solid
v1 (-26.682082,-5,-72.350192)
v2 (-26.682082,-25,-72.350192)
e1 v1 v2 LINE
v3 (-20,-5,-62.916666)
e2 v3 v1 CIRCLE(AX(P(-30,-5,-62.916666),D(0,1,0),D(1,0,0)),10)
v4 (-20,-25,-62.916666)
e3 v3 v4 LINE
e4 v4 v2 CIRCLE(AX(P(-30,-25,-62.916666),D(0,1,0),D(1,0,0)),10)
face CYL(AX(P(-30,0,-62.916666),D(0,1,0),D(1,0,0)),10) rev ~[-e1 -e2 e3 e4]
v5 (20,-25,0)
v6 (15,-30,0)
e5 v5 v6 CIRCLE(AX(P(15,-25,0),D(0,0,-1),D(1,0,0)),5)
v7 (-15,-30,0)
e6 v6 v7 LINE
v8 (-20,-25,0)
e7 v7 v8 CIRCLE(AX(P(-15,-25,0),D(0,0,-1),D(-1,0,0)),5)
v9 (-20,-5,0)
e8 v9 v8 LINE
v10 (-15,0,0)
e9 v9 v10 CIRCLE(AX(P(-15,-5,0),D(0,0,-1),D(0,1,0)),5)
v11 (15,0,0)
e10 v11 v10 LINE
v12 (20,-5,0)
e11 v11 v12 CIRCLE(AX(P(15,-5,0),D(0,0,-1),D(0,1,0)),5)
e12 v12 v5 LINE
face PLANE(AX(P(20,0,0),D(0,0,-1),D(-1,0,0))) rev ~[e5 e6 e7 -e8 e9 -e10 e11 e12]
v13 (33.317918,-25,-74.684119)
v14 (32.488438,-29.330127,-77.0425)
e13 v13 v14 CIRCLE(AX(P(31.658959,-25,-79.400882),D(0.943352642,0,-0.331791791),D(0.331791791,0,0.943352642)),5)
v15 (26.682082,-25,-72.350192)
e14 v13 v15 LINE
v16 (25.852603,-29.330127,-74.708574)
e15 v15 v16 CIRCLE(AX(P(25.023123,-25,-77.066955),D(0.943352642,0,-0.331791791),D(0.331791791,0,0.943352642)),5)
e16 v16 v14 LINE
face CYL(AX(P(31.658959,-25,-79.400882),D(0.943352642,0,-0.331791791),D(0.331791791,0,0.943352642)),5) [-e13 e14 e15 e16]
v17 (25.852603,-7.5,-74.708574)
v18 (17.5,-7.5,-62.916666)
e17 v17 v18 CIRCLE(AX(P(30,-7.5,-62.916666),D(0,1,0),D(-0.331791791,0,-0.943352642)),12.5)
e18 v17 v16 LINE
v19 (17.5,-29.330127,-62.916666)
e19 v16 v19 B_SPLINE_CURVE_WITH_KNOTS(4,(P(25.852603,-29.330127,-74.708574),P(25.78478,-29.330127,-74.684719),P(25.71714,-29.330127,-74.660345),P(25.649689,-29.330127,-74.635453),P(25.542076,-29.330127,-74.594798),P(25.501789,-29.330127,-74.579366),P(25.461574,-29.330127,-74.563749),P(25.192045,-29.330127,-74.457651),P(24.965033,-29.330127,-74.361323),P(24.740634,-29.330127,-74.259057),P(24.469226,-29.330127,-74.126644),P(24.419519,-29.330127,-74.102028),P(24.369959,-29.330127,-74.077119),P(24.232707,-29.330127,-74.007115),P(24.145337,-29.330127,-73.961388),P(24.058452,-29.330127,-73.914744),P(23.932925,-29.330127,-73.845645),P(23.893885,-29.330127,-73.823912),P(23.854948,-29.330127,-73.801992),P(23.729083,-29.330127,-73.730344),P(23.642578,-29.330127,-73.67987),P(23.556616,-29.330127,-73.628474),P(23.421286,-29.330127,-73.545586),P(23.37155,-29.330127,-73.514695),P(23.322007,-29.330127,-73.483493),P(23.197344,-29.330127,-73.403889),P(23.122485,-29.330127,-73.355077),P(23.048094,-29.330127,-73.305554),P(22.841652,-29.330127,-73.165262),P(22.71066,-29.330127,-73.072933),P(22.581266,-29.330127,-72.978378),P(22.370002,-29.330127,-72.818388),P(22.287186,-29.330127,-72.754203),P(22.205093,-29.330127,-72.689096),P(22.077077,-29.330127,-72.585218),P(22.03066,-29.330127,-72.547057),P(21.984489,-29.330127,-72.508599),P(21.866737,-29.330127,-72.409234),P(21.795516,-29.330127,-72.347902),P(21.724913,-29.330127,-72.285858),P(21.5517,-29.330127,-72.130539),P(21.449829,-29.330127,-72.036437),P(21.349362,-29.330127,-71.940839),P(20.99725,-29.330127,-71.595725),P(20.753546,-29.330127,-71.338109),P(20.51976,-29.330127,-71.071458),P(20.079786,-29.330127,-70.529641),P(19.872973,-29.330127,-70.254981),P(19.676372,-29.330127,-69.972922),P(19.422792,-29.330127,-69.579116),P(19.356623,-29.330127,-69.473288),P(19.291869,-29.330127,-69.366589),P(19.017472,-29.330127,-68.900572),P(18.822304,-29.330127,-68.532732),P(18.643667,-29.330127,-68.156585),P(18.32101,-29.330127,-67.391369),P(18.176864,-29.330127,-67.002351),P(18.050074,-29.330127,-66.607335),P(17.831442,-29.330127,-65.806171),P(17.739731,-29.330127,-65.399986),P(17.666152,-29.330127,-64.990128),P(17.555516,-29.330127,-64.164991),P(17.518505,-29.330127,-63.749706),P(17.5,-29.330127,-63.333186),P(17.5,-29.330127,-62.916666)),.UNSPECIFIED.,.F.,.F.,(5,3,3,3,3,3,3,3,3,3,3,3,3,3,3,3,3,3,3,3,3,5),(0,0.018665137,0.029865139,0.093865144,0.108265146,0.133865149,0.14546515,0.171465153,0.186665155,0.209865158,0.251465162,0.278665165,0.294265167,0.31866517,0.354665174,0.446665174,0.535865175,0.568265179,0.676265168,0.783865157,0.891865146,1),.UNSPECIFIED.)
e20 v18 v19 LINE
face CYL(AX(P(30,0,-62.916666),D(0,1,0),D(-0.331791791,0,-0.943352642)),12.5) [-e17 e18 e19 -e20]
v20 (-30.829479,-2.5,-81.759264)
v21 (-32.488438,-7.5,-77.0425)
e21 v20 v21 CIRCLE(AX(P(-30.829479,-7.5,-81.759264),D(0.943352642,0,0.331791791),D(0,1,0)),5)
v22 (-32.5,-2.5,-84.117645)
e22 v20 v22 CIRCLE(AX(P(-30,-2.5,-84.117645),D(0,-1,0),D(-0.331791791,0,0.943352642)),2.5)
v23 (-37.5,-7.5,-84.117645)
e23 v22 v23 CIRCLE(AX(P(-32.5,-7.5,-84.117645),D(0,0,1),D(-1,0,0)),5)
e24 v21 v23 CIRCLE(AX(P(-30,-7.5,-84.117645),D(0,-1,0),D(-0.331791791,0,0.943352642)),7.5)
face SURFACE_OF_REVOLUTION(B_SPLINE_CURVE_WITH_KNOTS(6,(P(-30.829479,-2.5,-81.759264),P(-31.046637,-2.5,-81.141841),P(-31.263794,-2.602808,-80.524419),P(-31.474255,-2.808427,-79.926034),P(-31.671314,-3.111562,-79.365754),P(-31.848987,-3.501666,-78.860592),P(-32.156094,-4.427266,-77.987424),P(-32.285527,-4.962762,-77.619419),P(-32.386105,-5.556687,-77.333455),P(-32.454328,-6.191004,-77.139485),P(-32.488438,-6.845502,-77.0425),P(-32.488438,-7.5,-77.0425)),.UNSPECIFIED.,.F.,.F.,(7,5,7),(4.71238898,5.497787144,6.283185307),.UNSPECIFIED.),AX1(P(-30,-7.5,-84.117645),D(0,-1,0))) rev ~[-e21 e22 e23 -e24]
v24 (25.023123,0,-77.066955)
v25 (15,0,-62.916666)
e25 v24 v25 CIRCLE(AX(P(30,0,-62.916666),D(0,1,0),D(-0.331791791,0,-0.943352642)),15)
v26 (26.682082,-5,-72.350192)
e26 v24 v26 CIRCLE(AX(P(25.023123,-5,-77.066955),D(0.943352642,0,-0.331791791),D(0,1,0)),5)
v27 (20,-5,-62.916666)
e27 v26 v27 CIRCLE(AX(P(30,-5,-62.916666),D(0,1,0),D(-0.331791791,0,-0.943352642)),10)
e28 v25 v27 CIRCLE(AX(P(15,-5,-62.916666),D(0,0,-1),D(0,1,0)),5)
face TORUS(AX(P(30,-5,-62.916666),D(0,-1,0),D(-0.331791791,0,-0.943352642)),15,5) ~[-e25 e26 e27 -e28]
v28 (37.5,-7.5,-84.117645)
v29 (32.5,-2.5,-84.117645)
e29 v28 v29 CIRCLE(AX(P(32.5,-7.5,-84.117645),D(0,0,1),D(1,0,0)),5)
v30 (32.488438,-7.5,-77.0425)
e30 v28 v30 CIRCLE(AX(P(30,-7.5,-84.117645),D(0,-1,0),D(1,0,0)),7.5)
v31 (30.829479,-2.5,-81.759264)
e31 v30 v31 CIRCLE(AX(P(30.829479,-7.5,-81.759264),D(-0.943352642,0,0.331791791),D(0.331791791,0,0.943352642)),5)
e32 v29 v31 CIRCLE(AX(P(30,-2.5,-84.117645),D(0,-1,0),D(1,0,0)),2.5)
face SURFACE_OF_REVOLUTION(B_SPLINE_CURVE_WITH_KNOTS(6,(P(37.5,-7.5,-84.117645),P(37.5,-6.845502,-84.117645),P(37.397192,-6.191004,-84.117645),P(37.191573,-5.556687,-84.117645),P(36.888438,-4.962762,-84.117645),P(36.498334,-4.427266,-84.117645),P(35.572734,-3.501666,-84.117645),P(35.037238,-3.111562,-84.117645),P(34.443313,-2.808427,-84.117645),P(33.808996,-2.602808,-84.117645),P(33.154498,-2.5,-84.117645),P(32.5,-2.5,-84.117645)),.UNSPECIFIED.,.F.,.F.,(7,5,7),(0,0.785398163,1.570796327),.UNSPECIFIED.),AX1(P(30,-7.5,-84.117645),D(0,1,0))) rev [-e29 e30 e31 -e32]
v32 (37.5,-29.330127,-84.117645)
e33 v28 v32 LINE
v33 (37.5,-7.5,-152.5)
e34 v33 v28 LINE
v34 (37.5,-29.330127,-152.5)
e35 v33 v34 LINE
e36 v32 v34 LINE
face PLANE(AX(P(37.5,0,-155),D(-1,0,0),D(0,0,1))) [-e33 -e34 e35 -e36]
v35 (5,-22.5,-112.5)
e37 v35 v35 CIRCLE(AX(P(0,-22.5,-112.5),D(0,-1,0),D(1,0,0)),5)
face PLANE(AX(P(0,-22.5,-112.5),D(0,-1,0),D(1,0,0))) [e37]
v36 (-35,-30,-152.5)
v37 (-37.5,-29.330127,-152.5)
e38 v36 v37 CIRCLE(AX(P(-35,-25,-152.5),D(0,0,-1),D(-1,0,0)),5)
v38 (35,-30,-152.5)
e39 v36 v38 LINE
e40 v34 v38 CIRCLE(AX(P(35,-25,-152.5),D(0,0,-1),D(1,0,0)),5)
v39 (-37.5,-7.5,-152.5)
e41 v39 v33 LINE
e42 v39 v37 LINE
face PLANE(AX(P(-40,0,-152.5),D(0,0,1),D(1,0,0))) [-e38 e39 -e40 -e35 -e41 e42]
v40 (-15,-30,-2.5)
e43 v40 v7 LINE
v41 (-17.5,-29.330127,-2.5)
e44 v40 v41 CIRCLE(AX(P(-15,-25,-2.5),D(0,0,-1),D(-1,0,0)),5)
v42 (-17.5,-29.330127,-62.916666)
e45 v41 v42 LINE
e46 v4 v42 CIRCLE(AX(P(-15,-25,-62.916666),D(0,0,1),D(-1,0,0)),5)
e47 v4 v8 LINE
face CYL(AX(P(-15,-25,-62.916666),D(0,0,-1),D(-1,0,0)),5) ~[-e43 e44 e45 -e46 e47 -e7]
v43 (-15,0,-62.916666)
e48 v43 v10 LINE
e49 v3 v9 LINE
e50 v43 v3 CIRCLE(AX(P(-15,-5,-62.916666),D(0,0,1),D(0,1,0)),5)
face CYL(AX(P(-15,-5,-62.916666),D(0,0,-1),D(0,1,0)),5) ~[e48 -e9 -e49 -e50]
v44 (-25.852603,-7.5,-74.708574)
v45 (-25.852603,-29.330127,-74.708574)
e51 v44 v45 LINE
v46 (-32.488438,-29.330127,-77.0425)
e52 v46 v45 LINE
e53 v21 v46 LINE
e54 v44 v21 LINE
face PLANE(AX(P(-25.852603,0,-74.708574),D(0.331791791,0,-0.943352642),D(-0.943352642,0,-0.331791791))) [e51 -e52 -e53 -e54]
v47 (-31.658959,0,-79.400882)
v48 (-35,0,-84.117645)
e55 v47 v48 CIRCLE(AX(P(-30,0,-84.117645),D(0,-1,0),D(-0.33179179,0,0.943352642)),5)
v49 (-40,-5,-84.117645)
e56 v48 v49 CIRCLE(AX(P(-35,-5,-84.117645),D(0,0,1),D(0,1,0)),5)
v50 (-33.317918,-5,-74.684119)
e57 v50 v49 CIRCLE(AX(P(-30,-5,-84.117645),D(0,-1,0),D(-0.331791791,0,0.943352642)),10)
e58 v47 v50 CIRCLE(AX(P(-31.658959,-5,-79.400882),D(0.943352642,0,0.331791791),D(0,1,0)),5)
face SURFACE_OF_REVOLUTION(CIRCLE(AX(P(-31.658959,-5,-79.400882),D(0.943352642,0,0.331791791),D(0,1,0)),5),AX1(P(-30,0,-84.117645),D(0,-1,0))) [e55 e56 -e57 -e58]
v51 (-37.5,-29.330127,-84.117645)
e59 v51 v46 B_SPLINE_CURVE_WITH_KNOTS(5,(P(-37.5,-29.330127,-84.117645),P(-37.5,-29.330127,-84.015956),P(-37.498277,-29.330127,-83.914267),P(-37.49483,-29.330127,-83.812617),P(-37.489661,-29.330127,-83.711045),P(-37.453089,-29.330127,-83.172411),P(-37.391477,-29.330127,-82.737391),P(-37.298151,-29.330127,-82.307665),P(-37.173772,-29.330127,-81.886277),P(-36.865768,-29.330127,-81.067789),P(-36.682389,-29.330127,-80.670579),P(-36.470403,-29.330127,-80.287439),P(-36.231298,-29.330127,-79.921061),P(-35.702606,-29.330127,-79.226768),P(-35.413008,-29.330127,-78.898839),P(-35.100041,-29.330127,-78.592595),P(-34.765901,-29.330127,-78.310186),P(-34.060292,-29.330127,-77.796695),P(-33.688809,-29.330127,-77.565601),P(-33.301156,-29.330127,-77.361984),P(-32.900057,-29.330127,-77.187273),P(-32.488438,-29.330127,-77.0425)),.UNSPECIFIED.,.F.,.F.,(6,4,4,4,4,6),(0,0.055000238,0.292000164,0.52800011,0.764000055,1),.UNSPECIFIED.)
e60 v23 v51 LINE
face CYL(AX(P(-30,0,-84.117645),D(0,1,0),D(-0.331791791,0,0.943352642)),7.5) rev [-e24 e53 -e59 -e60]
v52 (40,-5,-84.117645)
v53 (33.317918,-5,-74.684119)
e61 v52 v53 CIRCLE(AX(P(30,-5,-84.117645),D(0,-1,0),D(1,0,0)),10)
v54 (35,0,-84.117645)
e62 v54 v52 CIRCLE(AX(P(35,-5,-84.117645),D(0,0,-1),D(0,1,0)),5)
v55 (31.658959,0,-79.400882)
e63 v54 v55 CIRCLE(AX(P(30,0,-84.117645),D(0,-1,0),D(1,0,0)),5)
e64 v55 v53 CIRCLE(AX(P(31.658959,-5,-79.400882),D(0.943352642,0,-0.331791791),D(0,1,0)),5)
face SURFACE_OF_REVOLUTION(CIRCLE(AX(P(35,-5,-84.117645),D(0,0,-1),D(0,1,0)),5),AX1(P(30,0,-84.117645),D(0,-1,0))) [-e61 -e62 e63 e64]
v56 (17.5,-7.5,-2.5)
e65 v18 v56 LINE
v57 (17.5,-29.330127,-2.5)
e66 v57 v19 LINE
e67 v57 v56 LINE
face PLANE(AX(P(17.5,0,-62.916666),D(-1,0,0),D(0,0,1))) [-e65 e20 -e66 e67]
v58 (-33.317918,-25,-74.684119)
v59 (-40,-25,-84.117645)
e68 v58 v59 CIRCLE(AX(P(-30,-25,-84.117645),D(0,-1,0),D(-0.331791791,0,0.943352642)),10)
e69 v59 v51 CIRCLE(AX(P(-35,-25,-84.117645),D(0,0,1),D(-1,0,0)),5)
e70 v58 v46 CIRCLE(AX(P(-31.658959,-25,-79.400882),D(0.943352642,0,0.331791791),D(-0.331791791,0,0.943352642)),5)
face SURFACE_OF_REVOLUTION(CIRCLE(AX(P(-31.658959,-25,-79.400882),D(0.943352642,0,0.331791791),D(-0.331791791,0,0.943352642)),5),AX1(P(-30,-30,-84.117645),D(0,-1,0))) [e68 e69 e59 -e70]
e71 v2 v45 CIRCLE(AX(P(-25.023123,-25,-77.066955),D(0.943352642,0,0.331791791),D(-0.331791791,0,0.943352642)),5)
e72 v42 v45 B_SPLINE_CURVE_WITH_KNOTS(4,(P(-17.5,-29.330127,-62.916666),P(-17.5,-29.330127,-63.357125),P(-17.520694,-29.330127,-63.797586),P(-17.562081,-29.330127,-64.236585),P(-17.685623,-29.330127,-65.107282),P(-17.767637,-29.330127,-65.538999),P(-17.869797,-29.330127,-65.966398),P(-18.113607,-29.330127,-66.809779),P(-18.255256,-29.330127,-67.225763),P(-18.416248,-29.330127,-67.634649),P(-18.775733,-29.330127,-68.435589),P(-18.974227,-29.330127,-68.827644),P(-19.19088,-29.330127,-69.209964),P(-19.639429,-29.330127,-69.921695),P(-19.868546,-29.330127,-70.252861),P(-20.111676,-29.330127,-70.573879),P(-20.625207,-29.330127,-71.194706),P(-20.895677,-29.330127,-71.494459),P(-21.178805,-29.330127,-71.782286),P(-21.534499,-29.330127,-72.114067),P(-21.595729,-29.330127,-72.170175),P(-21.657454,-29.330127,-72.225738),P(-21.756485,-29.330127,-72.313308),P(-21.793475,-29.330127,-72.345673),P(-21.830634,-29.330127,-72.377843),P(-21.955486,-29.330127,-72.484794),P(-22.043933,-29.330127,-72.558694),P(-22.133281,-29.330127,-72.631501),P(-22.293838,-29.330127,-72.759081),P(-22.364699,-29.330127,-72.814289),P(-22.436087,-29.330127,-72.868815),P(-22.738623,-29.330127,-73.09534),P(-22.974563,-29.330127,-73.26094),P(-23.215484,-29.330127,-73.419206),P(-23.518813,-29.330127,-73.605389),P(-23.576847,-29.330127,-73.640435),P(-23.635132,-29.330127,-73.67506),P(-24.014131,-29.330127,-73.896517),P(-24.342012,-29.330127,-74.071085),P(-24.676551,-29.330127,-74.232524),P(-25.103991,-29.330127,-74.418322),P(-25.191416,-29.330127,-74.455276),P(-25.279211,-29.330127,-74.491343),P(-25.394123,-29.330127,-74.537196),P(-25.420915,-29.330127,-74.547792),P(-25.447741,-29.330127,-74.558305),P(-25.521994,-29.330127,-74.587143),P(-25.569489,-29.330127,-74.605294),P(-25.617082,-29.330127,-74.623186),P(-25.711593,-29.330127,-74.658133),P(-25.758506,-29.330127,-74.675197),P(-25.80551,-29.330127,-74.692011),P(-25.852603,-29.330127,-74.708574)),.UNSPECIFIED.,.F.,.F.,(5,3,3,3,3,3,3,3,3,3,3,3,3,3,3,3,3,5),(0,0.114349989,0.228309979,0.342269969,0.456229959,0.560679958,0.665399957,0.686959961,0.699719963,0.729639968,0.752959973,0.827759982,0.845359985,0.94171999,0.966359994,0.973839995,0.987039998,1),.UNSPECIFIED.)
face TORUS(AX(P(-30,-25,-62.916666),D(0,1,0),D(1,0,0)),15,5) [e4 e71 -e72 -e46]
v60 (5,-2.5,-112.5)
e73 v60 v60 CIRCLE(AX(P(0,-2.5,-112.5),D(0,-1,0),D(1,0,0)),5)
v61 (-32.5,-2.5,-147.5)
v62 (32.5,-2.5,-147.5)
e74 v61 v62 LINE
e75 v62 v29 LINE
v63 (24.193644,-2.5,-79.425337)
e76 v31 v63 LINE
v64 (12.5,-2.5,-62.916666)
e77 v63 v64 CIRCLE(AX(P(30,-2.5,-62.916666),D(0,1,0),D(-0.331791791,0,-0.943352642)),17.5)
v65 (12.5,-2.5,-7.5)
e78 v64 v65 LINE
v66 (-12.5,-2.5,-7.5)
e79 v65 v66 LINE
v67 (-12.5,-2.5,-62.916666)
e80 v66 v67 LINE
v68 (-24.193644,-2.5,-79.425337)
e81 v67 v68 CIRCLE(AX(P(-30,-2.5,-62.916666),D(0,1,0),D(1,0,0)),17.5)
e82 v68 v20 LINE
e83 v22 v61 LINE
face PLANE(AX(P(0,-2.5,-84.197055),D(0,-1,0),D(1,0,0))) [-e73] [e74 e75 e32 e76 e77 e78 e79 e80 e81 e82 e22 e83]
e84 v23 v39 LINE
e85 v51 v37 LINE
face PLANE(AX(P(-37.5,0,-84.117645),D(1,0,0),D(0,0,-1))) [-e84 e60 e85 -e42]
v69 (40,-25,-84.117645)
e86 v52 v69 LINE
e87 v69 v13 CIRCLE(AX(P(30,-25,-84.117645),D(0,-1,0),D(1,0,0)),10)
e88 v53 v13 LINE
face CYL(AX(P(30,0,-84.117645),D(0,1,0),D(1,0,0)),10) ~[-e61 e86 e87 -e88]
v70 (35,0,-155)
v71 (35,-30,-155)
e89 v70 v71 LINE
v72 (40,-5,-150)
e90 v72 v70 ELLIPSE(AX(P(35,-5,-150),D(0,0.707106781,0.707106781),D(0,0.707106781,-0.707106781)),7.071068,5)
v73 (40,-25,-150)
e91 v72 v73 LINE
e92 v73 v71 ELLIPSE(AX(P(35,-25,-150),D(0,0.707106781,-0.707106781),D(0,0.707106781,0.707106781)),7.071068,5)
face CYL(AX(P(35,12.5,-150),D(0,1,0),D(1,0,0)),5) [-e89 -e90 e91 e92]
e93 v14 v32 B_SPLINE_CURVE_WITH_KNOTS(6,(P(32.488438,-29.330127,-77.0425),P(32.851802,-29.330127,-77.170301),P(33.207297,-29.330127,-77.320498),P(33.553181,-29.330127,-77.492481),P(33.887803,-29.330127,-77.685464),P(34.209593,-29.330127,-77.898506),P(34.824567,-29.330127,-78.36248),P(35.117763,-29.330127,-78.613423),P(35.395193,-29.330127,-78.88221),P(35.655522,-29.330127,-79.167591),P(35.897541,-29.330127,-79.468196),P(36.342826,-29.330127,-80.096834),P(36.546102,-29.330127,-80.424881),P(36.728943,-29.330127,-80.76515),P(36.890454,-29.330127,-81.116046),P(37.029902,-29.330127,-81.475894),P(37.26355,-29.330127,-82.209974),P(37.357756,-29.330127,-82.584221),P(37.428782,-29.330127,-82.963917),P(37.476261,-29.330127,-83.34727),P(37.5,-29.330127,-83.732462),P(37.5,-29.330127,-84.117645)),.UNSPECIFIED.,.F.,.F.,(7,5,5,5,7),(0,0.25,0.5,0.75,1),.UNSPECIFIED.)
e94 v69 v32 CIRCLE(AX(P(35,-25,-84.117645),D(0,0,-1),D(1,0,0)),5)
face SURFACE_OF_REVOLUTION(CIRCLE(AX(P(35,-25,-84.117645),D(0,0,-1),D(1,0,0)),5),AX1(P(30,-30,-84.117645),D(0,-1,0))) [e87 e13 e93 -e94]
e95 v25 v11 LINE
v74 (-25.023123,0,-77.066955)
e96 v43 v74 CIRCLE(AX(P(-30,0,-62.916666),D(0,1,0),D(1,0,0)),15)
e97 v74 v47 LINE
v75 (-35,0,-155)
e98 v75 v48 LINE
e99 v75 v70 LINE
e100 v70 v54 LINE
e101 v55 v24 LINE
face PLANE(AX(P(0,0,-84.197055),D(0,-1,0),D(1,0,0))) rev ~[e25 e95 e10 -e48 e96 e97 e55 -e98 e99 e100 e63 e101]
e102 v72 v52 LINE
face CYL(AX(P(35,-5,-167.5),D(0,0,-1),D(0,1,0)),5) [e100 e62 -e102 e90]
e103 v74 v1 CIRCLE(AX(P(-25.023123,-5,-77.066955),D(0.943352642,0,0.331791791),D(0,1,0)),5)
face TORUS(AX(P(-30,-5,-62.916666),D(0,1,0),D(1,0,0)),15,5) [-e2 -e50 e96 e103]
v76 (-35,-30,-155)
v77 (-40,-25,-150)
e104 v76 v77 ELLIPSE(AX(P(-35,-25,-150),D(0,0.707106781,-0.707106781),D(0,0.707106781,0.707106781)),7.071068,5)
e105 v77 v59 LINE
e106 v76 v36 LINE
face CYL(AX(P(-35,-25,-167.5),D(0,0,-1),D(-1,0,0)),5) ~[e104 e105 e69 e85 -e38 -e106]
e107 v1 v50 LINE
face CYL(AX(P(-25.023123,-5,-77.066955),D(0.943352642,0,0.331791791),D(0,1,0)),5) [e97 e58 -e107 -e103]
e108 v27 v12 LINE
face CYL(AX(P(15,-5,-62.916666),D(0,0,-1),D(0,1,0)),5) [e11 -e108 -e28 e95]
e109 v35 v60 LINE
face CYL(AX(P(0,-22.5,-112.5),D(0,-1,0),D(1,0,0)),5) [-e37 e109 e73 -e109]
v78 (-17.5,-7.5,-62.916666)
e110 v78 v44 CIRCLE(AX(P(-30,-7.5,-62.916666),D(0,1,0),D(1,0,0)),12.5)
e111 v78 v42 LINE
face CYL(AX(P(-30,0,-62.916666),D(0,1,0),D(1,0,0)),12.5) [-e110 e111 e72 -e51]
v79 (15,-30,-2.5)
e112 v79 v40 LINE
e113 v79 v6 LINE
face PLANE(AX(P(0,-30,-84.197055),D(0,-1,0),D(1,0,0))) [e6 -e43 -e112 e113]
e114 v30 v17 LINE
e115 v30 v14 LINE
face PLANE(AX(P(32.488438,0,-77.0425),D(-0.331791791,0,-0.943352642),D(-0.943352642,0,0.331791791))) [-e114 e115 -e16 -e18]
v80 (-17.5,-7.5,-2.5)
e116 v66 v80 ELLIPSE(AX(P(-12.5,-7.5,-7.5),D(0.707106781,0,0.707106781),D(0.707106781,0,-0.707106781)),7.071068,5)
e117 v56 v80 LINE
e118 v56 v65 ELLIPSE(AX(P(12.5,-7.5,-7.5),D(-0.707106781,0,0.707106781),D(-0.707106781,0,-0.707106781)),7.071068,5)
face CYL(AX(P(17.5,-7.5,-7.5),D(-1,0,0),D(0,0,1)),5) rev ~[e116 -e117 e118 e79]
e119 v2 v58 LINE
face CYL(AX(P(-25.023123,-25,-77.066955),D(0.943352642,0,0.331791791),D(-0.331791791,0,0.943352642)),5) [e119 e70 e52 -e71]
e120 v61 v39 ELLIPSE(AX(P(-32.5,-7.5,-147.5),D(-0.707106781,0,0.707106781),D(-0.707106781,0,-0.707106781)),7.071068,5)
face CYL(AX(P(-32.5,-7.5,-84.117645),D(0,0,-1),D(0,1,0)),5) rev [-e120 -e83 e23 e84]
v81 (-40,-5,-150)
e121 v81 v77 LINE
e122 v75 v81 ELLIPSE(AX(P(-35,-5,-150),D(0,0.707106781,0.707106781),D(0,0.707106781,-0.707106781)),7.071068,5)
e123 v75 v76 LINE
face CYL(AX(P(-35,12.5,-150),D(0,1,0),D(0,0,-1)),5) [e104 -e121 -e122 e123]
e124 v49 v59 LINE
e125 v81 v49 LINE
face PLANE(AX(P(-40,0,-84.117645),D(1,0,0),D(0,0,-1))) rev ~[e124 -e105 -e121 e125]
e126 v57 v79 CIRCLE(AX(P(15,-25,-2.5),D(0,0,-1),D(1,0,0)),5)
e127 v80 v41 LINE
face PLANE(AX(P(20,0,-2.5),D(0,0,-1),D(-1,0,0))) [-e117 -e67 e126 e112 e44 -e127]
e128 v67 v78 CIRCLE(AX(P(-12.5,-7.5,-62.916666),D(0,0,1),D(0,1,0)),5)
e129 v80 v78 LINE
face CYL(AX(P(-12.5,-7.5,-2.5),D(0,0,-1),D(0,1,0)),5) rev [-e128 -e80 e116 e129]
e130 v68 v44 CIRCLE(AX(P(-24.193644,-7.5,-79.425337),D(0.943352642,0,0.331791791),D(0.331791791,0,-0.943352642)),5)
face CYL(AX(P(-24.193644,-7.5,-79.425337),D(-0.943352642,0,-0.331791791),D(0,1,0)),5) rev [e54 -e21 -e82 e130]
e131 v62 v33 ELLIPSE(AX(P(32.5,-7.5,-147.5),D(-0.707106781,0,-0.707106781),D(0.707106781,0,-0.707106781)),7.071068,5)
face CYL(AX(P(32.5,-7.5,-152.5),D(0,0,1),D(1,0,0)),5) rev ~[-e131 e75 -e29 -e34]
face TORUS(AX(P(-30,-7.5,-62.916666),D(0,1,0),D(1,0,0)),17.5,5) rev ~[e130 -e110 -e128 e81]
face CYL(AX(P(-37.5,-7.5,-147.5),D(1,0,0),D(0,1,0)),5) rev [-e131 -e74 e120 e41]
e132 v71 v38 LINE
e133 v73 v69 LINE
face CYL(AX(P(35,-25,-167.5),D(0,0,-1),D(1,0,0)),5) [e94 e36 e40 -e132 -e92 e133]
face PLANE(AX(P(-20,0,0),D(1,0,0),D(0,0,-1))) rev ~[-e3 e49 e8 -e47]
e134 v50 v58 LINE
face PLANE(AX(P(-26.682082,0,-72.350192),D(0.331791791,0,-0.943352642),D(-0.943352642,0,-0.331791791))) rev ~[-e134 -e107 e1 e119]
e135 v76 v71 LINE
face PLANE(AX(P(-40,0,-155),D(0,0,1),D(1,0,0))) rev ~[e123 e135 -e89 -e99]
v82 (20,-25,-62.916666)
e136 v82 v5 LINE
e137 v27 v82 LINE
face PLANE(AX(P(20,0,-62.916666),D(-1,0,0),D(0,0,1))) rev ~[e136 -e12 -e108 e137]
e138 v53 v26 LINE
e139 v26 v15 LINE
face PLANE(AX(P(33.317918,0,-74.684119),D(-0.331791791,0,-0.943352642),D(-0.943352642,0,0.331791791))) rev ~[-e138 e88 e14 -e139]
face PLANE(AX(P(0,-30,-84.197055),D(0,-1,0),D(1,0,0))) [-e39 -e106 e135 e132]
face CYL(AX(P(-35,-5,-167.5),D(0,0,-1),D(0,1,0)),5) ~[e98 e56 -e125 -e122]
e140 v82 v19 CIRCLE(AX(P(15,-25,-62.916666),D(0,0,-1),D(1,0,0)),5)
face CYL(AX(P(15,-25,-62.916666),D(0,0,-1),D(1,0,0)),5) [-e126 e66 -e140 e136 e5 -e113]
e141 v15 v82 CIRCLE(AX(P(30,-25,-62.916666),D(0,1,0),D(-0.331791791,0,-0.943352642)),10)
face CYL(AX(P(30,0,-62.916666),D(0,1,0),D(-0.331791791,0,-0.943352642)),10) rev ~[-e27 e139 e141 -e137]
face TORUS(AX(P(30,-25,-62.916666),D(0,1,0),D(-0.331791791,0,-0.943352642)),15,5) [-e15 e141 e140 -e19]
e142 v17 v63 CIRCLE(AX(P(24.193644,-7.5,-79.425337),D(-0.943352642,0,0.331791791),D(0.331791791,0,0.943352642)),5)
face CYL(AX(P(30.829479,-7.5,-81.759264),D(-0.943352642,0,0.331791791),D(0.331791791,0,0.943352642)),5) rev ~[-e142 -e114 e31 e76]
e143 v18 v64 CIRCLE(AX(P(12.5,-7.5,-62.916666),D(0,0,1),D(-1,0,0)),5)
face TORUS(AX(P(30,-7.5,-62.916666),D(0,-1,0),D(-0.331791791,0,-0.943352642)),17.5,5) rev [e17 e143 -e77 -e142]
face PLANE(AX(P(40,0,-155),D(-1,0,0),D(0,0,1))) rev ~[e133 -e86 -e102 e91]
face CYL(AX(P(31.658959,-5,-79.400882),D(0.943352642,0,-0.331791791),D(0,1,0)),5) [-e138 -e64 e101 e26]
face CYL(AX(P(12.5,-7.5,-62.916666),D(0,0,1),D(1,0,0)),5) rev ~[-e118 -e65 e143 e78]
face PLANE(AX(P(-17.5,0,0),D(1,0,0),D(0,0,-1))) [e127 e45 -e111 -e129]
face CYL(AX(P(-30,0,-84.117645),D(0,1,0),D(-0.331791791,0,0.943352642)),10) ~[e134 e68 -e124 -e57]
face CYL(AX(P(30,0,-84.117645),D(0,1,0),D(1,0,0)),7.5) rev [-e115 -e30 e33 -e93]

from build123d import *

# Parameters (mm, degrees)
F1_DEPTH     = 30
F2_T         = -2.5
F3_T1_DEPTH  = 55
F3_T3_DEPTH  = 83.3823547945
F3_T5_DEPTH  = 7.0343109423
F3_T7_DEPTH  = 75.4166657368
F3_T9_DEPTH  = 7.0343109423
F3_T12_ANGLE = 70.6224339747
F3_T14_ANGLE = 70.6224339747
F3_T16_ANGLE = 70.6224339747
F3_T18_ANGLE = 70.6224339747
F3_T20_ANGLE = 70.6224339747
F3_T22_ANGLE = 70.6224339747
F3_T24_ANGLE = 70.6224339747
F3_T26_ANGLE = 70.6224339747
F5_R         = 5
F6_DEPTH     = 20
F7_R         = 5


# Not quite as in the source:
# - a fillet or chamfer that OpenCascade refuses, or shapes differently, is made with other operations: its cross-section is extruded or revolved along the edge and cut away or added


with BuildPart() as f1:
    # F0 (on Front) → F1 (new body)
    with BuildSketch(Plane.XZ):
        with BuildLine():
            Line((20, 0), (0, 0))
            Line((0, 0), (-20, 0))
            Line((-20, 0), (-20, -62.9166657368))
            ThreePointArc((-20, -62.9166657368), (-21.8397555469, -68.6968396499), (-26.6820820931, -72.3501921592))
            Line((-26.6820820931, -72.3501921592), (-33.3179179069, -74.6841187831))
            ThreePointArc((-33.3179179069, -74.6841187831), (-38.1602444531, -78.3374712924), (-40, -84.1176452055))
            Line((-40, -84.1176452055), (-40, -155))
            Line((-40, -155), (0, -155))
            Line((0, -155), (40, -155))
            Line((40, -155), (40, -84.1176452055))
            ThreePointArc((40, -84.1176452055), (38.1602444531, -78.3374712924), (33.3179179069, -74.6841187831))
            Line((33.3179179069, -74.6841187831), (26.6820820931, -72.3501921592))
            ThreePointArc((26.6820820931, -72.3501921592), (21.8397555469, -68.6968396499), (20, -62.9166657368))
            Line((20, -62.9166657368), (20, 0))
        make_face()
    extrude(amount=F1_DEPTH)

    # F2
    f2_openings = [f1.faces().sort_by_distance(p)[0] for p in [
        (0, -30, -90.139239),
    ]]
    offset(amount=F2_T, openings=f2_openings)

    # F3: fillet of radius 5 on 8 edges, made by hand

    # F3_s2 → F3_t1 (cut)
    with BuildSketch(Plane.XZ.offset(-12.5)):
        with BuildLine():
            ThreePointArc((-35, -155), (-38.5355339059, -153.5355339059), (-40, -150))
            Line((-40, -150), (-40, -155))
            Line((-40, -155), (-35, -155))
        make_face()
        with BuildLine():
            ThreePointArc((40, -150), (38.5355339059, -153.5355339059), (35, -155))
            Line((35, -155), (40, -155))
            Line((40, -155), (40, -150))
        make_face()
    extrude(amount=F3_T1_DEPTH, mode=Mode.SUBTRACT)

    # F3_s4 → F3_t3 (cut)
    with BuildSketch(Plane.XY.offset(-167.5)):
        with BuildLine():
            ThreePointArc((-35, 0), (-38.5355339059, -1.4644660941), (-40, -5))
            Line((-40, -5), (-40, 0))
            Line((-40, 0), (-35, 0))
        make_face()
        with BuildLine():
            ThreePointArc((-40, -25), (-38.5355339059, -28.5355339059), (-35, -30))
            Line((-35, -30), (-40, -30))
            Line((-40, -30), (-40, -25))
        make_face()
        with BuildLine():
            ThreePointArc((35, 0), (38.5355339059, -1.4644660941), (40, -5))
            Line((40, -5), (40, 0))
            Line((40, 0), (35, 0))
        make_face()
        with BuildLine():
            ThreePointArc((40, -25), (38.5355339059, -28.5355339059), (35, -30))
            Line((35, -30), (40, -30))
            Line((40, -30), (40, -25))
        make_face()
    extrude(amount=F3_T3_DEPTH, mode=Mode.SUBTRACT)

    # F3_s6 → F3_t5 (cut)
    with BuildSketch(Plane(origin=(53.0259684291, 0, -18.6500574974), x_dir=(0, 1, 0), z_dir=(-0.9433526422, 0, 0.3317917907))):
        with BuildLine():
            ThreePointArc((-25, 59.3988491433), (-28.5355339059, 60.8633152374), (-30, 64.3988491433))
            Line((-30, 64.3988491433), (-30, 59.3988491433))
            Line((-30, 59.3988491433), (-25, 59.3988491433))
        make_face()
        with BuildLine():
            ThreePointArc((0, 64.3988491433), (-1.4644660941, 60.8633152374), (-5, 59.3988491433))
            Line((-5, 59.3988491433), (0, 59.3988491433))
            Line((0, 59.3988491433), (0, 64.3988491433))
        make_face()
    extrude(amount=F3_T5_DEPTH, mode=Mode.SUBTRACT)

    # F3_s8 → F3_t7 (cut)
    with BuildSketch(Plane.XY.offset(-62.9166657368)):
        with BuildLine():
            ThreePointArc((20, -25), (18.5355339059, -28.5355339059), (15, -30))
            Line((15, -30), (20, -30))
            Line((20, -30), (20, -25))
        make_face()
        with BuildLine():
            ThreePointArc((15, 0), (18.5355339059, -1.4644660941), (20, -5))
            Line((20, -5), (20, 0))
            Line((20, 0), (15, 0))
        make_face()
        with BuildLine():
            ThreePointArc((-20, -25), (-18.5355339059, -28.5355339059), (-15, -30))
            Line((-15, -30), (-20, -30))
            Line((-20, -30), (-20, -25))
        make_face()
        with BuildLine():
            ThreePointArc((-15, 0), (-18.5355339059, -1.4644660941), (-20, -5))
            Line((-20, -5), (-20, 0))
            Line((-20, 0), (-15, 0))
        make_face()
    extrude(amount=F3_T7_DEPTH, mode=Mode.SUBTRACT)

    # F3_s10 → F3_t9 (cut)
    with BuildSketch(Plane(origin=(-46.3901326153, 0, -16.3161308736), x_dir=(0, 1, 0), z_dir=(-0.9433526422, 0, -0.3317917907))):
        with BuildLine():
            ThreePointArc((-25, 59.3988491433), (-28.5355339059, 60.8633152374), (-30, 64.3988491433))
            Line((-30, 64.3988491433), (-30, 59.3988491433))
            Line((-30, 59.3988491433), (-25, 59.3988491433))
        make_face()
        with BuildLine():
            ThreePointArc((0, 64.3988491433), (-1.4644660941, 60.8633152374), (-5, 59.3988491433))
            Line((-5, 59.3988491433), (0, 59.3988491433))
            Line((0, 59.3988491433), (0, 64.3988491433))
        make_face()
    extrude(amount=F3_T9_DEPTH, mode=Mode.SUBTRACT)

    # F3_s11 → F3_t12 (revolve, cut)
    with BuildSketch(Plane.XY.offset(-84.1176452055)):
        with BuildLine():
            ThreePointArc((40, -25), (38.5355339059, -28.5355339059), (35, -30))
            Line((35, -30), (40, -30))
            Line((40, -30), (40, -25))
        make_face()
    revolve(axis=Axis((30, -30, -84.1176452055), (0, -1, 0)), revolution_arc=F3_T12_ANGLE, mode=Mode.SUBTRACT)

    # F3_s13 → F3_t14 (revolve, cut)
    with BuildSketch(Plane(origin=(46.3901326153, 0, -16.3161308736), x_dir=(0, 1, 0), z_dir=(0.9433526422, 0, -0.3317917907))):
        with BuildLine():
            ThreePointArc((-25, -59.3988491433), (-28.5355339059, -60.8633152374), (-30, -64.3988491433))
            Line((-30, -64.3988491433), (-30, -59.3988491433))
            Line((-30, -59.3988491433), (-25, -59.3988491433))
        make_face()
    revolve(axis=Axis((30, -30, -62.9166657368), (0, 1, 0)), revolution_arc=F3_T14_ANGLE, mode=Mode.SUBTRACT)

    # F3_s15 → F3_t16 (revolve, cut)
    with BuildSketch(Plane.XY.offset(-84.1176452055)):
        with BuildLine():
            ThreePointArc((35, 0), (38.5355339059, -1.4644660941), (40, -5))
            Line((40, -5), (40, 0))
            Line((40, 0), (35, 0))
        make_face()
    revolve(axis=Axis((30, 0, -84.1176452055), (0, -1, 0)), revolution_arc=F3_T16_ANGLE, mode=Mode.SUBTRACT)

    # F3_s17 → F3_t18 (revolve, cut)
    with BuildSketch(Plane(origin=(46.3901326153, 0, -16.3161308736), x_dir=(0, 1, 0), z_dir=(0.9433526422, 0, -0.3317917907))):
        with BuildLine():
            ThreePointArc((-5, -59.3988491433), (-1.4644660941, -60.8633152374), (0, -64.3988491433))
            Line((0, -64.3988491433), (0, -59.3988491433))
            Line((0, -59.3988491433), (-5, -59.3988491433))
        make_face()
    revolve(axis=Axis((30, 0, -62.9166657368), (0, 1, 0)), revolution_arc=F3_T18_ANGLE, mode=Mode.SUBTRACT)

    # F3_s19 → F3_t20 (revolve, cut)
    with BuildSketch(Plane(origin=(-53.0259684291, 0, -18.6500574974), x_dir=(0, 1, 0), z_dir=(0.9433526422, 0, 0.3317917907))):
        with BuildLine():
            ThreePointArc((-25, -59.3988491433), (-28.5355339059, -60.8633152374), (-30, -64.3988491433))
            Line((-30, -64.3988491433), (-30, -59.3988491433))
            Line((-30, -59.3988491433), (-25, -59.3988491433))
        make_face()
    revolve(axis=Axis((-30, -30, -84.1176452055), (0, -1, 0)), revolution_arc=F3_T20_ANGLE, mode=Mode.SUBTRACT)

    # F3_s21 → F3_t22 (revolve, cut)
    with BuildSketch(Plane.XY.offset(-62.9166657368)):
        with BuildLine():
            ThreePointArc((-20, -25), (-18.5355339059, -28.5355339059), (-15, -30))
            Line((-15, -30), (-20, -30))
            Line((-20, -30), (-20, -25))
        make_face()
    revolve(axis=Axis((-30, -30, -62.9166657368), (0, 1, 0)), revolution_arc=F3_T22_ANGLE, mode=Mode.SUBTRACT)

    # F3_s23 → F3_t24 (revolve, cut)
    with BuildSketch(Plane(origin=(-53.0259684291, 0, -18.6500574974), x_dir=(0, 1, 0), z_dir=(0.9433526422, 0, 0.3317917907))):
        with BuildLine():
            ThreePointArc((0, -64.3988491433), (-1.4644660941, -60.8633152374), (-5, -59.3988491433))
            Line((-5, -59.3988491433), (0, -59.3988491433))
            Line((0, -59.3988491433), (0, -64.3988491433))
        make_face()
    revolve(axis=Axis((-30, 0, -84.1176452055), (0, -1, 0)), revolution_arc=F3_T24_ANGLE, mode=Mode.SUBTRACT)

    # F3_s25 → F3_t26 (revolve, cut)
    with BuildSketch(Plane.XY.offset(-62.9166657368)):
        with BuildLine():
            ThreePointArc((-15, 0), (-18.5355339059, -1.4644660941), (-20, -5))
            Line((-20, -5), (-20, 0))
            Line((-20, 0), (-15, 0))
        make_face()
    revolve(axis=Axis((-30, 0, -62.9166657368), (0, 1, 0)), revolution_arc=F3_T26_ANGLE, mode=Mode.SUBTRACT)

    # F5 (on offset) → F6 (join)
    with BuildSketch(Plane.XZ.offset(22.5)):
        with Locations((0, -112.5)):
            Circle(F5_R)
    extrude(amount=-F6_DEPTH)

    # F7
    f7_edges = [f1.edges().sort_by_distance(p)[0] for p in [
        (-37.5, -2.5, -118.308823),
        (0, -2.5, -152.5),
        (0, -2.5, -2.5),
        (17.5, -2.5, -32.708333),
    ]]
    fillet(f7_edges, radius=F7_R)


solid = f1.part
